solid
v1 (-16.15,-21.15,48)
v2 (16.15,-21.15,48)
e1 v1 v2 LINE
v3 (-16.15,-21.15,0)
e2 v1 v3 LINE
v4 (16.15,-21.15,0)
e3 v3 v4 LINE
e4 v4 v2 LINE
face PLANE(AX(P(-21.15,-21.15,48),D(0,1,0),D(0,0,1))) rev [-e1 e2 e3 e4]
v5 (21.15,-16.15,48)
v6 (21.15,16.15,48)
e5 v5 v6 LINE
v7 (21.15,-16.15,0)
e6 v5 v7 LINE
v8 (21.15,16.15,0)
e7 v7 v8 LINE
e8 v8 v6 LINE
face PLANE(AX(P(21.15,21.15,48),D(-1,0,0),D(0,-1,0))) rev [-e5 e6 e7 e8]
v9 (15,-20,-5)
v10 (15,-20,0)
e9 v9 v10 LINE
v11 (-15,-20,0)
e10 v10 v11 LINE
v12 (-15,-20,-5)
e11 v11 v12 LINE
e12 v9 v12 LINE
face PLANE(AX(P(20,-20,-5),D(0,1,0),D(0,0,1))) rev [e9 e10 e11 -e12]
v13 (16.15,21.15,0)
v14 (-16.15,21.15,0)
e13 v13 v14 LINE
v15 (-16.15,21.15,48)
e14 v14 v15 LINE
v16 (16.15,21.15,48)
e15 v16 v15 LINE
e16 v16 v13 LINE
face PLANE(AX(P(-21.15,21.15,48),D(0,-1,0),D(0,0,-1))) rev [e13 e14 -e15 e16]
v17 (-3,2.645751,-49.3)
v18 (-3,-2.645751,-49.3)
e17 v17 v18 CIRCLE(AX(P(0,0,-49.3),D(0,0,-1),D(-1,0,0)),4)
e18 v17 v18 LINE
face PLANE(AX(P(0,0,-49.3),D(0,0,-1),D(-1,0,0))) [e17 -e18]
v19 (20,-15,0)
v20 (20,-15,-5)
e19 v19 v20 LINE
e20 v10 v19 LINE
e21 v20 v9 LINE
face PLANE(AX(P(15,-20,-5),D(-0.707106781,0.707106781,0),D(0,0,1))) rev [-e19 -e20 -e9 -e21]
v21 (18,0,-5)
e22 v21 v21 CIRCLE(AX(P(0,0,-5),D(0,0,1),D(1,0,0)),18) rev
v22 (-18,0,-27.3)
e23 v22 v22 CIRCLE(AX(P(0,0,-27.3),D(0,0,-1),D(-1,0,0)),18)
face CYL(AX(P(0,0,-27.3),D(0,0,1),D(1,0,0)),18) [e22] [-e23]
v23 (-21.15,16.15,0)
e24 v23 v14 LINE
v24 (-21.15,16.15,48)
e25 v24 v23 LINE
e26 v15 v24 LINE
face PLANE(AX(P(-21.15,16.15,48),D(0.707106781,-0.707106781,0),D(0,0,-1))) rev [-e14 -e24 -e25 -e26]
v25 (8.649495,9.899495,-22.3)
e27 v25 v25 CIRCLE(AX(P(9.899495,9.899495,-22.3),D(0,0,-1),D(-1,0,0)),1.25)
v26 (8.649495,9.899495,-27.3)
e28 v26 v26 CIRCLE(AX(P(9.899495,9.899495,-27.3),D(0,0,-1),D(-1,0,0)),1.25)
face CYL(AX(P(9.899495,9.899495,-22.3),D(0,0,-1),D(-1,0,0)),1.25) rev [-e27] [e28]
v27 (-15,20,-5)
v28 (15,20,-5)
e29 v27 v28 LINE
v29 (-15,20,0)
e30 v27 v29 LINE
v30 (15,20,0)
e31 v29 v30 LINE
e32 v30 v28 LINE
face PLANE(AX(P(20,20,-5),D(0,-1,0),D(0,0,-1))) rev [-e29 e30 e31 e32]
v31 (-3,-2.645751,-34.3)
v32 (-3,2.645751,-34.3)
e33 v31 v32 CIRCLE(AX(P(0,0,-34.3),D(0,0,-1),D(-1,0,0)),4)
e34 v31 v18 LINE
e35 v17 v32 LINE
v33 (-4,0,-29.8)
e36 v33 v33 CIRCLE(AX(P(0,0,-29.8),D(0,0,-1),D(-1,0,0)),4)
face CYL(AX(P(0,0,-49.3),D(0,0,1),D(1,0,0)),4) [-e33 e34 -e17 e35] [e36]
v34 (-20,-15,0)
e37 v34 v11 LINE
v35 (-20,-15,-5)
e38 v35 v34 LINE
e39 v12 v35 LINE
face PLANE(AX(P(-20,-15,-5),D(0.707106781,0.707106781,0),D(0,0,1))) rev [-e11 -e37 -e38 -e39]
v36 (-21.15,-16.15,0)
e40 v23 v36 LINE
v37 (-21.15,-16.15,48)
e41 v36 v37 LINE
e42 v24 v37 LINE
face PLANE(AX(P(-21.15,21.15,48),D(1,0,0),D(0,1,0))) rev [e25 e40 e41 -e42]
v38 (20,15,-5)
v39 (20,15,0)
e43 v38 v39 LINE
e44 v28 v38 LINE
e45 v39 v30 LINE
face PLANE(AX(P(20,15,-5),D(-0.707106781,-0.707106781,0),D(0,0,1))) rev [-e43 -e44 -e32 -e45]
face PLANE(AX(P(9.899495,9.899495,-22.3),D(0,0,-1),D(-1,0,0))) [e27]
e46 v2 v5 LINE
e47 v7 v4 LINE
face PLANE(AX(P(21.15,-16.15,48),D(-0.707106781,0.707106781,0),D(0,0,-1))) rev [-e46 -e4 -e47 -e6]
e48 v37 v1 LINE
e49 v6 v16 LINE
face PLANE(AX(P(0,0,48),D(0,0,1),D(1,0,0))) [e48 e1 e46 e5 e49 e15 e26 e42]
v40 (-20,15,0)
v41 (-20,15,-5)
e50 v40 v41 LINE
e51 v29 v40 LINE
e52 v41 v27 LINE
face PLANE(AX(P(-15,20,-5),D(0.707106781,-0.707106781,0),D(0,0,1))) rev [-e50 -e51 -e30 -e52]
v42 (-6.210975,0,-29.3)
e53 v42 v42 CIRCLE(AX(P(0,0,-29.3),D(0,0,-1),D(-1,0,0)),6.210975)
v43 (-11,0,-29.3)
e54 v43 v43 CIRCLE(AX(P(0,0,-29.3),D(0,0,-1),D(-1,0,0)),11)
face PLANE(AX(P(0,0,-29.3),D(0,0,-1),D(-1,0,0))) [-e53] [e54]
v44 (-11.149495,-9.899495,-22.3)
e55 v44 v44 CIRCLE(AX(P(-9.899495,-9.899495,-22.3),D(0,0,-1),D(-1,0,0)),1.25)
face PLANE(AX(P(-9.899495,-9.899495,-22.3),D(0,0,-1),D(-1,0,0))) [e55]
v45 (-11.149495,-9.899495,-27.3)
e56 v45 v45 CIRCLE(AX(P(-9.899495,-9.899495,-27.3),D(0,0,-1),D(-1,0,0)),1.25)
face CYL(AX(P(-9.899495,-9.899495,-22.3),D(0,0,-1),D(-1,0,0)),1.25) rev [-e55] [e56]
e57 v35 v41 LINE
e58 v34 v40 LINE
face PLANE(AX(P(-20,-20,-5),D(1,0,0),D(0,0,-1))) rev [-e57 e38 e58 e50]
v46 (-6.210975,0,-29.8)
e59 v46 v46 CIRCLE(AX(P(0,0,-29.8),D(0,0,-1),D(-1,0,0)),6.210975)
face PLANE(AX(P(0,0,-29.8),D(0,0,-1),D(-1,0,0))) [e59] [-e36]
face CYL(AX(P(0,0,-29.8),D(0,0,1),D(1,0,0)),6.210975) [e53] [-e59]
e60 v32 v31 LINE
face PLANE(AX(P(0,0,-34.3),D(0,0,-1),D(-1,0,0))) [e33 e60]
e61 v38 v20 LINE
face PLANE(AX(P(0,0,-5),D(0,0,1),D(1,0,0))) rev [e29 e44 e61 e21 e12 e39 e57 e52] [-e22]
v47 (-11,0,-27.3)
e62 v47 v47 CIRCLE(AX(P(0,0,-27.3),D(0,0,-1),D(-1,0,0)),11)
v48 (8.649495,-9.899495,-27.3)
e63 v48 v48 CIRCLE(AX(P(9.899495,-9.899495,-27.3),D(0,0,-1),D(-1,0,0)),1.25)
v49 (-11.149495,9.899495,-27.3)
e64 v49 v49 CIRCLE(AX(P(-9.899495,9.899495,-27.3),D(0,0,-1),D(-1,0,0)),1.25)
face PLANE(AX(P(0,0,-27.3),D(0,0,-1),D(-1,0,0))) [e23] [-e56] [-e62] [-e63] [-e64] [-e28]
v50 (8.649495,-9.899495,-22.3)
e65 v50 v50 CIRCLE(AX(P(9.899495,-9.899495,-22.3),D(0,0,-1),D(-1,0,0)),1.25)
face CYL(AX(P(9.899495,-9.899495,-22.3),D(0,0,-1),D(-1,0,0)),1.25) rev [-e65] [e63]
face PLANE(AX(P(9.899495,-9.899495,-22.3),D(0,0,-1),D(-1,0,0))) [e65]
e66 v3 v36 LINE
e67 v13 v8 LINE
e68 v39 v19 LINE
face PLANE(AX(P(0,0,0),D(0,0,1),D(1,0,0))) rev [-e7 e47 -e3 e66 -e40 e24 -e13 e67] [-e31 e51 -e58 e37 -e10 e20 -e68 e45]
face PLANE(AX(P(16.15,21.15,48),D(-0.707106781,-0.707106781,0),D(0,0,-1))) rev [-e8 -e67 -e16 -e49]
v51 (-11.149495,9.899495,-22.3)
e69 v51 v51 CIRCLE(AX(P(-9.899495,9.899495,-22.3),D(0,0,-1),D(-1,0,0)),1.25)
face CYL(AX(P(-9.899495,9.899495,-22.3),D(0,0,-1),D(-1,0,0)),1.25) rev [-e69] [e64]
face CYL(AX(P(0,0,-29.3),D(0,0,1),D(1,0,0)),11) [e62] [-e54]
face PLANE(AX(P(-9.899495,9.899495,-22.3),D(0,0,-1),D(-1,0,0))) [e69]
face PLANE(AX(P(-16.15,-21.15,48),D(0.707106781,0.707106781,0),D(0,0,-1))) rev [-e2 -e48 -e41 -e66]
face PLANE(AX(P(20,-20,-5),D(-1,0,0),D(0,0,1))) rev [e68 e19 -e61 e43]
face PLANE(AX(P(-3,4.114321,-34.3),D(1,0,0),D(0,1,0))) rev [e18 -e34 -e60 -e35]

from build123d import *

# Parameters (mm, degrees)
SKETCH1_W           = 42.3
SKETCH1_H           = 42.3
BOSS_EXTRUDE1_DEPTH = 48
CHAMFER1_SIZE       = 5
SKETCH2_W           = 40
SKETCH2_H           = 40
BOSS_EXTRUDE2_DEPTH = 5
CHAMFER2_SIZE       = 5
SKETCH3_R           = 18
BOSS_EXTRUDE3_DEPTH = 22.3
SKETCH4_R           = 11
BOSS_EXTRUDE4_DEPTH = 2
SKETCH5_R           = 4
BOSS_EXTRUDE5_DEPTH = 20
SKETCH6_R           = 6.210975092
BOSS_EXTRUDE6_DEPTH = 0.5
SKETCH7_R           = 1.25
CUT_EXTRUDE1_DEPTH  = 5
SKETCH8_W           = 4.27994847
SKETCH8_H           = 8.688986299
CUT_EXTRUDE2_DEPTH  = 15


with BuildPart() as part:
    # Sketch1 → Boss-Extrude1 (new body)
    with BuildSketch(Plane.XY):
        Rectangle(SKETCH1_W, SKETCH1_H)
    extrude(amount=BOSS_EXTRUDE1_DEPTH)

    # Chamfer1
    chamfer1_edges = [part.edges().sort_by_distance(p)[0] for p in [
        (21.15, -21.15, 24),
        (-21.15, -21.15, 24),
        (-21.15, 21.15, 24),
        (21.15, 21.15, 24),
    ]]
    chamfer(chamfer1_edges, length=CHAMFER1_SIZE)

    # Sketch2 → Boss-Extrude2 (add)
    with BuildSketch(Plane(origin=(0, 0, 0), x_dir=(-1, 0, 0), z_dir=(0, 0, -1))):
        Rectangle(SKETCH2_W, SKETCH2_H)
    extrude(amount=BOSS_EXTRUDE2_DEPTH)

    # Chamfer2
    # the kernel refuses this chamfer: 5 mm, written as the material it takes off along each edge
    with BuildSketch(Plane(origin=(-20, -20, 0), x_dir=(-0.027495876610586317, 0.9996219169112968, 0), z_dir=(0, 0, -1)), Plane(origin=(-20, 20, 0), x_dir=(0.9996219169112968, 0.027495876610586317, 0), z_dir=(0, 0, -1))) as chamfer2_piece_1:
        Polygon((CHAMFER2_SIZE * 0.999621916911, CHAMFER2_SIZE * 0.0274958766106), (-CHAMFER2_SIZE * 0.0274958766106, CHAMFER2_SIZE * 0.999621916911), (0, 0), align=None)
    extrude(amount=17.85841494, mode=Mode.SUBTRACT)
    with BuildSketch(Plane(origin=(20, 20, 0), x_dir=(-0.9996219169112968, 0.027495876610586317, 0), z_dir=(0, 0, -1)), Plane(origin=(20, -20, 0), x_dir=(0.027495876610586317, 0.9996219169112968, 0), z_dir=(0, 0, -1))) as chamfer2_piece_2:
        Polygon((CHAMFER2_SIZE * 0.999621916911, -CHAMFER2_SIZE * 0.0274958766106), (-CHAMFER2_SIZE * 0.0274958766106, -CHAMFER2_SIZE * 0.999621916911), (0, 0), align=None)
    extrude(amount=17.85841494, mode=Mode.SUBTRACT)

    # Sketch3 → Boss-Extrude3 (add)
    with BuildSketch(Plane(origin=(0, 0, -5), x_dir=(-1, 0, 0), z_dir=(0, 0, -1))):
        with Locations(Location((0, 0, 0), (0, 0, 180))):
            Circle(SKETCH3_R)
    extrude(amount=BOSS_EXTRUDE3_DEPTH)

    # Sketch4 → Boss-Extrude4 (add)
    with BuildSketch(Plane(origin=(0, 0, -27.3), x_dir=(-1, 0, 0), z_dir=(0, 0, -1))):
        Circle(SKETCH4_R)
    extrude(amount=BOSS_EXTRUDE4_DEPTH)

    # Sketch5 → Boss-Extrude5 (add)
    with BuildSketch(Plane(origin=(0, 0, -29.3), x_dir=(-1, 0, 0), z_dir=(0, 0, -1))):
        Circle(SKETCH5_R)
    extrude(amount=BOSS_EXTRUDE5_DEPTH)

    # Sketch6 → Boss-Extrude6 (add)
    with BuildSketch(Plane(origin=(0, 0, -29.3), x_dir=(-1, 0, 0), z_dir=(0, 0, -1))):
        Circle(SKETCH6_R)
    extrude(amount=BOSS_EXTRUDE6_DEPTH)

    # Sketch7 → Cut-Extrude1 (cut)
    with BuildSketch(Plane(origin=(0, 0, -27.3), x_dir=(-1, 0, 0), z_dir=(0, 0, -1))):
        with Locations((9.899494937, 9.899494937)):
            Circle(SKETCH7_R)
        with Locations((9.899494937, -9.899494937)):
            Circle(SKETCH7_R)
        with Locations((-9.899494937, -9.899494937)):
            Circle(SKETCH7_R)
        with Locations((-9.899494937, 9.899494937)):
            Circle(SKETCH7_R)
    extrude(amount=-CUT_EXTRUDE1_DEPTH, mode=Mode.SUBTRACT)

    # Sketch8 → Cut-Extrude2 (cut)
    with BuildSketch(Plane(origin=(0, 0, -49.3), x_dir=(-1, 0, 0), z_dir=(0, 0, -1))):
        with Locations((5.139974235, -0.230171823)):
            Rectangle(SKETCH8_W, SKETCH8_H)
    extrude(amount=-CUT_EXTRUDE2_DEPTH, mode=Mode.SUBTRACT)


solid = part.part
